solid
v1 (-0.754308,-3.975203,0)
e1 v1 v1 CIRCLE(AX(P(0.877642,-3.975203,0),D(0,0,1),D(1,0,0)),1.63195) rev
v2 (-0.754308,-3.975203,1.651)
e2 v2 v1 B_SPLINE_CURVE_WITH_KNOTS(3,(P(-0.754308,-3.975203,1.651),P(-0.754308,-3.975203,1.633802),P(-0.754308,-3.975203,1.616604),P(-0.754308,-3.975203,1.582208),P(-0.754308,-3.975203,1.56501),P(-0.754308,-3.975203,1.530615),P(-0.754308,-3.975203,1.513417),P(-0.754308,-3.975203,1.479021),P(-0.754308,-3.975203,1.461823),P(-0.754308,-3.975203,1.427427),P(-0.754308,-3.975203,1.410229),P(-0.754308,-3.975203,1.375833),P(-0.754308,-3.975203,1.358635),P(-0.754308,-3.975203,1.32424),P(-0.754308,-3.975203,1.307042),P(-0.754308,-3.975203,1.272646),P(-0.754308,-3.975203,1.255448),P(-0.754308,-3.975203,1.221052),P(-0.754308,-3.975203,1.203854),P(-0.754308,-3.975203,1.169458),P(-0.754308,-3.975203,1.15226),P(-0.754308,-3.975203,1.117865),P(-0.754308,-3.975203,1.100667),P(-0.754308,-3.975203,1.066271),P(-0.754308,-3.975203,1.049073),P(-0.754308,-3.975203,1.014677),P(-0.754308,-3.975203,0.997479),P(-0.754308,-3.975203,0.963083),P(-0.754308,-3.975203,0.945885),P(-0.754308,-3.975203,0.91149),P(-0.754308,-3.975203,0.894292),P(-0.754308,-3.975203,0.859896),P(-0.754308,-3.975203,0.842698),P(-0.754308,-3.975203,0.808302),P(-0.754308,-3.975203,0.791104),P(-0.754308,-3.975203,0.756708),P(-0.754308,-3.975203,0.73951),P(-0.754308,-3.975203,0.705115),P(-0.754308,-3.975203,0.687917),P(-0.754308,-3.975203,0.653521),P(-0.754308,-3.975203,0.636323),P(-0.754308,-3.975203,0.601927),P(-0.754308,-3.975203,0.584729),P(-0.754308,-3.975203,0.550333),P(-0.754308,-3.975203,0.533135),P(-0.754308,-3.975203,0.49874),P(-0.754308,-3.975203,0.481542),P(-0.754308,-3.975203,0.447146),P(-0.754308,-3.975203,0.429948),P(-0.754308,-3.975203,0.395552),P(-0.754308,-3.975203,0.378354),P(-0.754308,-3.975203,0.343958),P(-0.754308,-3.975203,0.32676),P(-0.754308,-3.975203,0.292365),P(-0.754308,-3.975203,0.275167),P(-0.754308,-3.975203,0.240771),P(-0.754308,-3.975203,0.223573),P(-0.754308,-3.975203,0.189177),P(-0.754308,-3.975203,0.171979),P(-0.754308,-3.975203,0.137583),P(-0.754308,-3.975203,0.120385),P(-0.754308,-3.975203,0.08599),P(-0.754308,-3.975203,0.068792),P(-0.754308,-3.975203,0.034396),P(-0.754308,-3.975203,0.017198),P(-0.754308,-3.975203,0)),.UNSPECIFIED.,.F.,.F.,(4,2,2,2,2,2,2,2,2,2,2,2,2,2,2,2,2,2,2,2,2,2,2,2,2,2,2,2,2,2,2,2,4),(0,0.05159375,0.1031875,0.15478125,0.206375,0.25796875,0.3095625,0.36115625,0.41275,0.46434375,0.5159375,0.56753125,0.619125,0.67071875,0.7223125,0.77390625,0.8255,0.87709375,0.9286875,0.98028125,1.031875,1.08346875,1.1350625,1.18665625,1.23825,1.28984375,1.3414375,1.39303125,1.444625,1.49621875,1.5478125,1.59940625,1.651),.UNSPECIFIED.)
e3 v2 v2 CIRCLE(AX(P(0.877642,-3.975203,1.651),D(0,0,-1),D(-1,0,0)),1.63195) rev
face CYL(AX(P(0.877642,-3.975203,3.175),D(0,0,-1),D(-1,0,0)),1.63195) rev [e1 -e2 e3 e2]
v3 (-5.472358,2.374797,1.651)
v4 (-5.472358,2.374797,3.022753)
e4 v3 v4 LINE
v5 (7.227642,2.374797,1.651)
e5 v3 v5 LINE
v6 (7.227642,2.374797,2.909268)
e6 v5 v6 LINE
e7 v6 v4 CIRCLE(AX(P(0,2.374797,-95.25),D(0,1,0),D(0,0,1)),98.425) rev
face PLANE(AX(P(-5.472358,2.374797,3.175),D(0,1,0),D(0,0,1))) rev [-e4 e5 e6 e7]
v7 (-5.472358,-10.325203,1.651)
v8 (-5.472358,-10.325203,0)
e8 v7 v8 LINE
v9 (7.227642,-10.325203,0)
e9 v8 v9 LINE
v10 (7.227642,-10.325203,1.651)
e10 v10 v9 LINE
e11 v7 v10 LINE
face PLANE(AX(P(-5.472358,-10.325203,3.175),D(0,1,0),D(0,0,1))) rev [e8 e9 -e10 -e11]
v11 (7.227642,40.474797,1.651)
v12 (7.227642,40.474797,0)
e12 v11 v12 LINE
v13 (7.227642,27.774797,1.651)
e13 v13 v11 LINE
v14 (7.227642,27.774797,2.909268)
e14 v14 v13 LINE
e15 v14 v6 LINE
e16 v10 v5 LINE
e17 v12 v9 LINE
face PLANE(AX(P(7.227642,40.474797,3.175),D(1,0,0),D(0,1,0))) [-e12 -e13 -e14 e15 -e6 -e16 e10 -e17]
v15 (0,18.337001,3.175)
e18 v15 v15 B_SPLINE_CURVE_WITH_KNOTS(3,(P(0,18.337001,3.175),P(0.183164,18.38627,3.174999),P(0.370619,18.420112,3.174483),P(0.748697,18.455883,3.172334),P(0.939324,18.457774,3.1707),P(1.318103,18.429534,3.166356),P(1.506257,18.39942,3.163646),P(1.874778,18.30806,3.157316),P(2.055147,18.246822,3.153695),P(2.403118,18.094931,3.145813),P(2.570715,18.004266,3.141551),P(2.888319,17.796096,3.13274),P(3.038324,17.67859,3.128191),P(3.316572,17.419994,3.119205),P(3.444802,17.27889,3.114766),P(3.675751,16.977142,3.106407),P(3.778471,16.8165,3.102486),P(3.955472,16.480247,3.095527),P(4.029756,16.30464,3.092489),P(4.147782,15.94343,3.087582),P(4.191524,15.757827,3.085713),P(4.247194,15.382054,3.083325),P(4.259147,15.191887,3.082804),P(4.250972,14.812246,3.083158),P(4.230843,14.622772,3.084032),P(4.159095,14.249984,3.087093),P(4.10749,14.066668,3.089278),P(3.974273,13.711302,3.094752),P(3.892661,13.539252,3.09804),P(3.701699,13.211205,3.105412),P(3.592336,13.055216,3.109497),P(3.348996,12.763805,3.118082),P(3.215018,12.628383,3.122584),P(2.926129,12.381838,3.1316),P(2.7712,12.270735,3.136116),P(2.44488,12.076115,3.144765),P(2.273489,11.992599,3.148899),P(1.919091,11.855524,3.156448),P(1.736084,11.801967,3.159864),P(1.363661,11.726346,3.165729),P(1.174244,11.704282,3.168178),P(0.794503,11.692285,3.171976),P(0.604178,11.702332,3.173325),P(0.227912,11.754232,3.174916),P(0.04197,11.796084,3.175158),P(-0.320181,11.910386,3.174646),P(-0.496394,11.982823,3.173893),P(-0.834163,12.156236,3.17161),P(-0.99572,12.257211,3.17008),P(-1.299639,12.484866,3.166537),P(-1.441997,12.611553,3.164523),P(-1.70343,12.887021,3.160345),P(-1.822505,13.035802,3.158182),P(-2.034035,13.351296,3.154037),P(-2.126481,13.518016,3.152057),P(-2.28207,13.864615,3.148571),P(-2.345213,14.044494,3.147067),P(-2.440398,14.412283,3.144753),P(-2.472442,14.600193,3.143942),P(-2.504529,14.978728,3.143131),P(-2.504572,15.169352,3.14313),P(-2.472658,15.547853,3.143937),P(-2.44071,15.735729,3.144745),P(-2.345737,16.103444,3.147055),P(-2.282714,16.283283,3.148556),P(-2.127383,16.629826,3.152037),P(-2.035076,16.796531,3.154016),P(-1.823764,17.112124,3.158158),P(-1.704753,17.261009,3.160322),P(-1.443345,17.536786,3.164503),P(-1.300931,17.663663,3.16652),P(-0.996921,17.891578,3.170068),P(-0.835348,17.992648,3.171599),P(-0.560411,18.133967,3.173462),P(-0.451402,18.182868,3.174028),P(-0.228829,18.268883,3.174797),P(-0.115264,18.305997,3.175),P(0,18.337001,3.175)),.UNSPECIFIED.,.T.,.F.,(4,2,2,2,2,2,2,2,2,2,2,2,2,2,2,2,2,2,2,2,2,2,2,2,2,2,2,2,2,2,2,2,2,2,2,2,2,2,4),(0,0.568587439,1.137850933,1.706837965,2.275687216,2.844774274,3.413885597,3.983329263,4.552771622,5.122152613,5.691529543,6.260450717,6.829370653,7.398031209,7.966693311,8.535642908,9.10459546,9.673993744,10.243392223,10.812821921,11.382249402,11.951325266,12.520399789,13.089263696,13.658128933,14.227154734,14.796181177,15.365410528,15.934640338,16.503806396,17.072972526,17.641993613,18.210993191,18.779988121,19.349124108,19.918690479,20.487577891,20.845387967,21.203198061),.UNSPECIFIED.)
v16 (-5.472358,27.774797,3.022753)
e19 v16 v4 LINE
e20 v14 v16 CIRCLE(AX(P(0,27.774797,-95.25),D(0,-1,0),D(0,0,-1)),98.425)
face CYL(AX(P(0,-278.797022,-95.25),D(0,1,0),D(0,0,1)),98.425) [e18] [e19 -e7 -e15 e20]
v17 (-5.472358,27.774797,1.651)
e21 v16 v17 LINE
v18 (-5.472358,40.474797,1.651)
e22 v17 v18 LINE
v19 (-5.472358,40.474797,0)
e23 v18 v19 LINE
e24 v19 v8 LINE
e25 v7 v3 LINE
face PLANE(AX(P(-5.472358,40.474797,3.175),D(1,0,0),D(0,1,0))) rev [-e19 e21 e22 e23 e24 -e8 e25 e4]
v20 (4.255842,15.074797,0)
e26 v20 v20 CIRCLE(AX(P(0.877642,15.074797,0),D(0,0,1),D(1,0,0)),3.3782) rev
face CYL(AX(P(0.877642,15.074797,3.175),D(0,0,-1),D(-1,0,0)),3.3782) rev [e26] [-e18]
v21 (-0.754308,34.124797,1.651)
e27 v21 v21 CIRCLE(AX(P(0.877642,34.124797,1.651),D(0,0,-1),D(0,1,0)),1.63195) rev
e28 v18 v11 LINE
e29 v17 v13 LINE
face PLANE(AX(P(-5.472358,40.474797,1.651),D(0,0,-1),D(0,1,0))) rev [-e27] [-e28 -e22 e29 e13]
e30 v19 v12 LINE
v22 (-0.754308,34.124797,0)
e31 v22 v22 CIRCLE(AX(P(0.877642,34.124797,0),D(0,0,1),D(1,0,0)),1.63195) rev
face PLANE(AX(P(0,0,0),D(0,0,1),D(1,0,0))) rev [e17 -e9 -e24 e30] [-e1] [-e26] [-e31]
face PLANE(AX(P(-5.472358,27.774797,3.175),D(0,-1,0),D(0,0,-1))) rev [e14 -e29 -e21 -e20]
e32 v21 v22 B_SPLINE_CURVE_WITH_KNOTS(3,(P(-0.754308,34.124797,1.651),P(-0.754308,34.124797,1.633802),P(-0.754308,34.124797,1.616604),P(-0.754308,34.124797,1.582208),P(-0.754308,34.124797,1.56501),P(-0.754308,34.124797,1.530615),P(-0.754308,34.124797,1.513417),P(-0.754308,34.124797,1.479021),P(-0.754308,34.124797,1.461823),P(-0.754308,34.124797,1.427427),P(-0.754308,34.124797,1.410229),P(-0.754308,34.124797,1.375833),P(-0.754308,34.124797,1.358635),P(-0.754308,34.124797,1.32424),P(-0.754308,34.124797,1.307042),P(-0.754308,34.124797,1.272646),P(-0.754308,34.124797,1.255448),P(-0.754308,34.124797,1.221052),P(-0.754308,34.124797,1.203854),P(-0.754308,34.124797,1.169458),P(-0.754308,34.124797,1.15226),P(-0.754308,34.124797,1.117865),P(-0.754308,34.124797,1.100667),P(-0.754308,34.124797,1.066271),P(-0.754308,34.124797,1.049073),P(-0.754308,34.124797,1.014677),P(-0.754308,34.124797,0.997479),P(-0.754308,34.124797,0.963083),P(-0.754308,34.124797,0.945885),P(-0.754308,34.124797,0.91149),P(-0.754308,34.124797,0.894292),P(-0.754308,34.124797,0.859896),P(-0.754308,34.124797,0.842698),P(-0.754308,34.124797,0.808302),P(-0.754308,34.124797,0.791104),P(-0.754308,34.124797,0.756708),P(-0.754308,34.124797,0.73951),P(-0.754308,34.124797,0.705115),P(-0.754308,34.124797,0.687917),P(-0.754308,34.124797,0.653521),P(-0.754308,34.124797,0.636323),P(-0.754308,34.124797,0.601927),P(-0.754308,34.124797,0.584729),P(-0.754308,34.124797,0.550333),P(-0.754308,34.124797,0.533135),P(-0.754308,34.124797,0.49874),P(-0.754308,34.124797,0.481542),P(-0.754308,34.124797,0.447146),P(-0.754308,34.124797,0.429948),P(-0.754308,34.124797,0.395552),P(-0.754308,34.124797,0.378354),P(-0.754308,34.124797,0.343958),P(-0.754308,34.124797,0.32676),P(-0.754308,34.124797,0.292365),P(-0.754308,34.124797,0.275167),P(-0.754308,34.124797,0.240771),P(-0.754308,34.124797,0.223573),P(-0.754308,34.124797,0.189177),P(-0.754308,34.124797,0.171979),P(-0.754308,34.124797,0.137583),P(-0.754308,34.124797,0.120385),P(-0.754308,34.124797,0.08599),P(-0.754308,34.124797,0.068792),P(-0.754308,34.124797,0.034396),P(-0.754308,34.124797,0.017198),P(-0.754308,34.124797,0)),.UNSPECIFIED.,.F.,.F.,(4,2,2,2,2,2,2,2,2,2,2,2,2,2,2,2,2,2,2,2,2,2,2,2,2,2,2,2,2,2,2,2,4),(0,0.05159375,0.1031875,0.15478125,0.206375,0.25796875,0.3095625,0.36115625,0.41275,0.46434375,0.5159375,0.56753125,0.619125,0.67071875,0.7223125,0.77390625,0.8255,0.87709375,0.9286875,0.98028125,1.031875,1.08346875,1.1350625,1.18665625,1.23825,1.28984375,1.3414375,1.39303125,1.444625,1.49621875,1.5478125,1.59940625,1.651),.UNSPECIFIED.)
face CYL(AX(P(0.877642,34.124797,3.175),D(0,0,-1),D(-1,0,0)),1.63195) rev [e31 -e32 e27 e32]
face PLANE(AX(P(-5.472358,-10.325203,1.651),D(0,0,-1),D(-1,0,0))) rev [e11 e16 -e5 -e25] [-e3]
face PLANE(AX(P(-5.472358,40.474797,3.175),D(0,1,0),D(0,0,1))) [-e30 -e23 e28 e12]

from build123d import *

# Parameters (mm, degrees)
SKETCH1_W                = 12.7
SKETCH1_H                = 50.8
BOSS_EXTRUDE1_DEPTH      = 3.175
CUT_EXTRUDE1_DEPTH       = 42.237466092
CUT_EXTRUDE1_DEPTH_BACK  = 42.237466092
SKETCH4_W                = 1.524
SKETCH4_H                = 12.7
CUT_EXTRUDE9_START       = 2.374796748
CUT_EXTRUDE9_DEPTH       = 25.4
CUT_EXTRUDE15_DEPTH      = 42.237466092
CUT_EXTRUDE15_DEPTH_BACK = 2.54
SKETCH7_R                = 1.63195
SKETCH7_R_2              = 3.3782


# Read off the part's stored shape, not the designer's step: Cut-Extrude9
with BuildPart() as part:
    # Sketch1 → Boss-Extrude1 (new body)
    with BuildSketch(Plane.XY):
        with Locations((0.877642276, 15.074796748)):
            Rectangle(SKETCH1_W, SKETCH1_H)
    extrude(amount=BOSS_EXTRUDE1_DEPTH)

    # Sketch4 → Cut-Extrude1 (cut, two sides: drawn at the far end of the back side and taken through both)
    with BuildSketch(Plane(origin=(0, 0, 0), x_dir=(0, 0, -1), z_dir=(1, 0, 0)).offset(-CUT_EXTRUDE1_DEPTH_BACK)):
        with Locations((-2.413, 34.124796748)):
            Rectangle(SKETCH4_W, SKETCH4_H)
        with Locations((-2.413, -3.975203252)):
            Rectangle(SKETCH4_W, SKETCH4_H)
    extrude(amount=CUT_EXTRUDE1_DEPTH + CUT_EXTRUDE1_DEPTH_BACK, mode=Mode.SUBTRACT)

    # Cut-Extrude9 outline → Cut-Extrude9 (cut)
    with BuildSketch(Plane(origin=(0, 0, 0), x_dir=(1, 0, 0), z_dir=(0, 1, 0)).offset(CUT_EXTRUDE9_START)):
        with BuildLine():
            ThreePointArc((7.227642276, -2.909267581), (3.616263069, -3.10854445), (5.36e-07, -3.175))
            Line((5.36e-07, -3.175), (7.227642276, -3.175))
            Line((7.227642276, -3.175), (7.227642276, -2.909267581))
        make_face()
        with BuildLine():
            ThreePointArc((5.36e-07, -3.175), (-2.737237313, -3.136930824), (-5.472357724, -3.022752714))
            Line((-5.472357724, -3.022752714), (-5.472357724, -3.175))
            Line((-5.472357724, -3.175), (5.36e-07, -3.175))
        make_face()
    extrude(amount=CUT_EXTRUDE9_DEPTH, mode=Mode.SUBTRACT)

    # Sketch7 → Cut-Extrude15 (cut, two sides: drawn at the far end of the back side and taken through both)
    with BuildSketch(Plane.XY.offset(-CUT_EXTRUDE15_DEPTH_BACK)):
        with Locations(Location((0.877642276, -3.975203252, 0), (0, 0, 180))):
            Circle(SKETCH7_R)
        with Locations(Location((0.877642276, 34.124796748, 0), (0, 0, 180))):
            Circle(SKETCH7_R)
        with Locations(Location((0.877642276, 15.074796748, 0), (0, 0, 105.05794783))):
            Circle(SKETCH7_R_2)
    extrude(amount=CUT_EXTRUDE15_DEPTH + CUT_EXTRUDE15_DEPTH_BACK, mode=Mode.SUBTRACT)


solid = part.part
